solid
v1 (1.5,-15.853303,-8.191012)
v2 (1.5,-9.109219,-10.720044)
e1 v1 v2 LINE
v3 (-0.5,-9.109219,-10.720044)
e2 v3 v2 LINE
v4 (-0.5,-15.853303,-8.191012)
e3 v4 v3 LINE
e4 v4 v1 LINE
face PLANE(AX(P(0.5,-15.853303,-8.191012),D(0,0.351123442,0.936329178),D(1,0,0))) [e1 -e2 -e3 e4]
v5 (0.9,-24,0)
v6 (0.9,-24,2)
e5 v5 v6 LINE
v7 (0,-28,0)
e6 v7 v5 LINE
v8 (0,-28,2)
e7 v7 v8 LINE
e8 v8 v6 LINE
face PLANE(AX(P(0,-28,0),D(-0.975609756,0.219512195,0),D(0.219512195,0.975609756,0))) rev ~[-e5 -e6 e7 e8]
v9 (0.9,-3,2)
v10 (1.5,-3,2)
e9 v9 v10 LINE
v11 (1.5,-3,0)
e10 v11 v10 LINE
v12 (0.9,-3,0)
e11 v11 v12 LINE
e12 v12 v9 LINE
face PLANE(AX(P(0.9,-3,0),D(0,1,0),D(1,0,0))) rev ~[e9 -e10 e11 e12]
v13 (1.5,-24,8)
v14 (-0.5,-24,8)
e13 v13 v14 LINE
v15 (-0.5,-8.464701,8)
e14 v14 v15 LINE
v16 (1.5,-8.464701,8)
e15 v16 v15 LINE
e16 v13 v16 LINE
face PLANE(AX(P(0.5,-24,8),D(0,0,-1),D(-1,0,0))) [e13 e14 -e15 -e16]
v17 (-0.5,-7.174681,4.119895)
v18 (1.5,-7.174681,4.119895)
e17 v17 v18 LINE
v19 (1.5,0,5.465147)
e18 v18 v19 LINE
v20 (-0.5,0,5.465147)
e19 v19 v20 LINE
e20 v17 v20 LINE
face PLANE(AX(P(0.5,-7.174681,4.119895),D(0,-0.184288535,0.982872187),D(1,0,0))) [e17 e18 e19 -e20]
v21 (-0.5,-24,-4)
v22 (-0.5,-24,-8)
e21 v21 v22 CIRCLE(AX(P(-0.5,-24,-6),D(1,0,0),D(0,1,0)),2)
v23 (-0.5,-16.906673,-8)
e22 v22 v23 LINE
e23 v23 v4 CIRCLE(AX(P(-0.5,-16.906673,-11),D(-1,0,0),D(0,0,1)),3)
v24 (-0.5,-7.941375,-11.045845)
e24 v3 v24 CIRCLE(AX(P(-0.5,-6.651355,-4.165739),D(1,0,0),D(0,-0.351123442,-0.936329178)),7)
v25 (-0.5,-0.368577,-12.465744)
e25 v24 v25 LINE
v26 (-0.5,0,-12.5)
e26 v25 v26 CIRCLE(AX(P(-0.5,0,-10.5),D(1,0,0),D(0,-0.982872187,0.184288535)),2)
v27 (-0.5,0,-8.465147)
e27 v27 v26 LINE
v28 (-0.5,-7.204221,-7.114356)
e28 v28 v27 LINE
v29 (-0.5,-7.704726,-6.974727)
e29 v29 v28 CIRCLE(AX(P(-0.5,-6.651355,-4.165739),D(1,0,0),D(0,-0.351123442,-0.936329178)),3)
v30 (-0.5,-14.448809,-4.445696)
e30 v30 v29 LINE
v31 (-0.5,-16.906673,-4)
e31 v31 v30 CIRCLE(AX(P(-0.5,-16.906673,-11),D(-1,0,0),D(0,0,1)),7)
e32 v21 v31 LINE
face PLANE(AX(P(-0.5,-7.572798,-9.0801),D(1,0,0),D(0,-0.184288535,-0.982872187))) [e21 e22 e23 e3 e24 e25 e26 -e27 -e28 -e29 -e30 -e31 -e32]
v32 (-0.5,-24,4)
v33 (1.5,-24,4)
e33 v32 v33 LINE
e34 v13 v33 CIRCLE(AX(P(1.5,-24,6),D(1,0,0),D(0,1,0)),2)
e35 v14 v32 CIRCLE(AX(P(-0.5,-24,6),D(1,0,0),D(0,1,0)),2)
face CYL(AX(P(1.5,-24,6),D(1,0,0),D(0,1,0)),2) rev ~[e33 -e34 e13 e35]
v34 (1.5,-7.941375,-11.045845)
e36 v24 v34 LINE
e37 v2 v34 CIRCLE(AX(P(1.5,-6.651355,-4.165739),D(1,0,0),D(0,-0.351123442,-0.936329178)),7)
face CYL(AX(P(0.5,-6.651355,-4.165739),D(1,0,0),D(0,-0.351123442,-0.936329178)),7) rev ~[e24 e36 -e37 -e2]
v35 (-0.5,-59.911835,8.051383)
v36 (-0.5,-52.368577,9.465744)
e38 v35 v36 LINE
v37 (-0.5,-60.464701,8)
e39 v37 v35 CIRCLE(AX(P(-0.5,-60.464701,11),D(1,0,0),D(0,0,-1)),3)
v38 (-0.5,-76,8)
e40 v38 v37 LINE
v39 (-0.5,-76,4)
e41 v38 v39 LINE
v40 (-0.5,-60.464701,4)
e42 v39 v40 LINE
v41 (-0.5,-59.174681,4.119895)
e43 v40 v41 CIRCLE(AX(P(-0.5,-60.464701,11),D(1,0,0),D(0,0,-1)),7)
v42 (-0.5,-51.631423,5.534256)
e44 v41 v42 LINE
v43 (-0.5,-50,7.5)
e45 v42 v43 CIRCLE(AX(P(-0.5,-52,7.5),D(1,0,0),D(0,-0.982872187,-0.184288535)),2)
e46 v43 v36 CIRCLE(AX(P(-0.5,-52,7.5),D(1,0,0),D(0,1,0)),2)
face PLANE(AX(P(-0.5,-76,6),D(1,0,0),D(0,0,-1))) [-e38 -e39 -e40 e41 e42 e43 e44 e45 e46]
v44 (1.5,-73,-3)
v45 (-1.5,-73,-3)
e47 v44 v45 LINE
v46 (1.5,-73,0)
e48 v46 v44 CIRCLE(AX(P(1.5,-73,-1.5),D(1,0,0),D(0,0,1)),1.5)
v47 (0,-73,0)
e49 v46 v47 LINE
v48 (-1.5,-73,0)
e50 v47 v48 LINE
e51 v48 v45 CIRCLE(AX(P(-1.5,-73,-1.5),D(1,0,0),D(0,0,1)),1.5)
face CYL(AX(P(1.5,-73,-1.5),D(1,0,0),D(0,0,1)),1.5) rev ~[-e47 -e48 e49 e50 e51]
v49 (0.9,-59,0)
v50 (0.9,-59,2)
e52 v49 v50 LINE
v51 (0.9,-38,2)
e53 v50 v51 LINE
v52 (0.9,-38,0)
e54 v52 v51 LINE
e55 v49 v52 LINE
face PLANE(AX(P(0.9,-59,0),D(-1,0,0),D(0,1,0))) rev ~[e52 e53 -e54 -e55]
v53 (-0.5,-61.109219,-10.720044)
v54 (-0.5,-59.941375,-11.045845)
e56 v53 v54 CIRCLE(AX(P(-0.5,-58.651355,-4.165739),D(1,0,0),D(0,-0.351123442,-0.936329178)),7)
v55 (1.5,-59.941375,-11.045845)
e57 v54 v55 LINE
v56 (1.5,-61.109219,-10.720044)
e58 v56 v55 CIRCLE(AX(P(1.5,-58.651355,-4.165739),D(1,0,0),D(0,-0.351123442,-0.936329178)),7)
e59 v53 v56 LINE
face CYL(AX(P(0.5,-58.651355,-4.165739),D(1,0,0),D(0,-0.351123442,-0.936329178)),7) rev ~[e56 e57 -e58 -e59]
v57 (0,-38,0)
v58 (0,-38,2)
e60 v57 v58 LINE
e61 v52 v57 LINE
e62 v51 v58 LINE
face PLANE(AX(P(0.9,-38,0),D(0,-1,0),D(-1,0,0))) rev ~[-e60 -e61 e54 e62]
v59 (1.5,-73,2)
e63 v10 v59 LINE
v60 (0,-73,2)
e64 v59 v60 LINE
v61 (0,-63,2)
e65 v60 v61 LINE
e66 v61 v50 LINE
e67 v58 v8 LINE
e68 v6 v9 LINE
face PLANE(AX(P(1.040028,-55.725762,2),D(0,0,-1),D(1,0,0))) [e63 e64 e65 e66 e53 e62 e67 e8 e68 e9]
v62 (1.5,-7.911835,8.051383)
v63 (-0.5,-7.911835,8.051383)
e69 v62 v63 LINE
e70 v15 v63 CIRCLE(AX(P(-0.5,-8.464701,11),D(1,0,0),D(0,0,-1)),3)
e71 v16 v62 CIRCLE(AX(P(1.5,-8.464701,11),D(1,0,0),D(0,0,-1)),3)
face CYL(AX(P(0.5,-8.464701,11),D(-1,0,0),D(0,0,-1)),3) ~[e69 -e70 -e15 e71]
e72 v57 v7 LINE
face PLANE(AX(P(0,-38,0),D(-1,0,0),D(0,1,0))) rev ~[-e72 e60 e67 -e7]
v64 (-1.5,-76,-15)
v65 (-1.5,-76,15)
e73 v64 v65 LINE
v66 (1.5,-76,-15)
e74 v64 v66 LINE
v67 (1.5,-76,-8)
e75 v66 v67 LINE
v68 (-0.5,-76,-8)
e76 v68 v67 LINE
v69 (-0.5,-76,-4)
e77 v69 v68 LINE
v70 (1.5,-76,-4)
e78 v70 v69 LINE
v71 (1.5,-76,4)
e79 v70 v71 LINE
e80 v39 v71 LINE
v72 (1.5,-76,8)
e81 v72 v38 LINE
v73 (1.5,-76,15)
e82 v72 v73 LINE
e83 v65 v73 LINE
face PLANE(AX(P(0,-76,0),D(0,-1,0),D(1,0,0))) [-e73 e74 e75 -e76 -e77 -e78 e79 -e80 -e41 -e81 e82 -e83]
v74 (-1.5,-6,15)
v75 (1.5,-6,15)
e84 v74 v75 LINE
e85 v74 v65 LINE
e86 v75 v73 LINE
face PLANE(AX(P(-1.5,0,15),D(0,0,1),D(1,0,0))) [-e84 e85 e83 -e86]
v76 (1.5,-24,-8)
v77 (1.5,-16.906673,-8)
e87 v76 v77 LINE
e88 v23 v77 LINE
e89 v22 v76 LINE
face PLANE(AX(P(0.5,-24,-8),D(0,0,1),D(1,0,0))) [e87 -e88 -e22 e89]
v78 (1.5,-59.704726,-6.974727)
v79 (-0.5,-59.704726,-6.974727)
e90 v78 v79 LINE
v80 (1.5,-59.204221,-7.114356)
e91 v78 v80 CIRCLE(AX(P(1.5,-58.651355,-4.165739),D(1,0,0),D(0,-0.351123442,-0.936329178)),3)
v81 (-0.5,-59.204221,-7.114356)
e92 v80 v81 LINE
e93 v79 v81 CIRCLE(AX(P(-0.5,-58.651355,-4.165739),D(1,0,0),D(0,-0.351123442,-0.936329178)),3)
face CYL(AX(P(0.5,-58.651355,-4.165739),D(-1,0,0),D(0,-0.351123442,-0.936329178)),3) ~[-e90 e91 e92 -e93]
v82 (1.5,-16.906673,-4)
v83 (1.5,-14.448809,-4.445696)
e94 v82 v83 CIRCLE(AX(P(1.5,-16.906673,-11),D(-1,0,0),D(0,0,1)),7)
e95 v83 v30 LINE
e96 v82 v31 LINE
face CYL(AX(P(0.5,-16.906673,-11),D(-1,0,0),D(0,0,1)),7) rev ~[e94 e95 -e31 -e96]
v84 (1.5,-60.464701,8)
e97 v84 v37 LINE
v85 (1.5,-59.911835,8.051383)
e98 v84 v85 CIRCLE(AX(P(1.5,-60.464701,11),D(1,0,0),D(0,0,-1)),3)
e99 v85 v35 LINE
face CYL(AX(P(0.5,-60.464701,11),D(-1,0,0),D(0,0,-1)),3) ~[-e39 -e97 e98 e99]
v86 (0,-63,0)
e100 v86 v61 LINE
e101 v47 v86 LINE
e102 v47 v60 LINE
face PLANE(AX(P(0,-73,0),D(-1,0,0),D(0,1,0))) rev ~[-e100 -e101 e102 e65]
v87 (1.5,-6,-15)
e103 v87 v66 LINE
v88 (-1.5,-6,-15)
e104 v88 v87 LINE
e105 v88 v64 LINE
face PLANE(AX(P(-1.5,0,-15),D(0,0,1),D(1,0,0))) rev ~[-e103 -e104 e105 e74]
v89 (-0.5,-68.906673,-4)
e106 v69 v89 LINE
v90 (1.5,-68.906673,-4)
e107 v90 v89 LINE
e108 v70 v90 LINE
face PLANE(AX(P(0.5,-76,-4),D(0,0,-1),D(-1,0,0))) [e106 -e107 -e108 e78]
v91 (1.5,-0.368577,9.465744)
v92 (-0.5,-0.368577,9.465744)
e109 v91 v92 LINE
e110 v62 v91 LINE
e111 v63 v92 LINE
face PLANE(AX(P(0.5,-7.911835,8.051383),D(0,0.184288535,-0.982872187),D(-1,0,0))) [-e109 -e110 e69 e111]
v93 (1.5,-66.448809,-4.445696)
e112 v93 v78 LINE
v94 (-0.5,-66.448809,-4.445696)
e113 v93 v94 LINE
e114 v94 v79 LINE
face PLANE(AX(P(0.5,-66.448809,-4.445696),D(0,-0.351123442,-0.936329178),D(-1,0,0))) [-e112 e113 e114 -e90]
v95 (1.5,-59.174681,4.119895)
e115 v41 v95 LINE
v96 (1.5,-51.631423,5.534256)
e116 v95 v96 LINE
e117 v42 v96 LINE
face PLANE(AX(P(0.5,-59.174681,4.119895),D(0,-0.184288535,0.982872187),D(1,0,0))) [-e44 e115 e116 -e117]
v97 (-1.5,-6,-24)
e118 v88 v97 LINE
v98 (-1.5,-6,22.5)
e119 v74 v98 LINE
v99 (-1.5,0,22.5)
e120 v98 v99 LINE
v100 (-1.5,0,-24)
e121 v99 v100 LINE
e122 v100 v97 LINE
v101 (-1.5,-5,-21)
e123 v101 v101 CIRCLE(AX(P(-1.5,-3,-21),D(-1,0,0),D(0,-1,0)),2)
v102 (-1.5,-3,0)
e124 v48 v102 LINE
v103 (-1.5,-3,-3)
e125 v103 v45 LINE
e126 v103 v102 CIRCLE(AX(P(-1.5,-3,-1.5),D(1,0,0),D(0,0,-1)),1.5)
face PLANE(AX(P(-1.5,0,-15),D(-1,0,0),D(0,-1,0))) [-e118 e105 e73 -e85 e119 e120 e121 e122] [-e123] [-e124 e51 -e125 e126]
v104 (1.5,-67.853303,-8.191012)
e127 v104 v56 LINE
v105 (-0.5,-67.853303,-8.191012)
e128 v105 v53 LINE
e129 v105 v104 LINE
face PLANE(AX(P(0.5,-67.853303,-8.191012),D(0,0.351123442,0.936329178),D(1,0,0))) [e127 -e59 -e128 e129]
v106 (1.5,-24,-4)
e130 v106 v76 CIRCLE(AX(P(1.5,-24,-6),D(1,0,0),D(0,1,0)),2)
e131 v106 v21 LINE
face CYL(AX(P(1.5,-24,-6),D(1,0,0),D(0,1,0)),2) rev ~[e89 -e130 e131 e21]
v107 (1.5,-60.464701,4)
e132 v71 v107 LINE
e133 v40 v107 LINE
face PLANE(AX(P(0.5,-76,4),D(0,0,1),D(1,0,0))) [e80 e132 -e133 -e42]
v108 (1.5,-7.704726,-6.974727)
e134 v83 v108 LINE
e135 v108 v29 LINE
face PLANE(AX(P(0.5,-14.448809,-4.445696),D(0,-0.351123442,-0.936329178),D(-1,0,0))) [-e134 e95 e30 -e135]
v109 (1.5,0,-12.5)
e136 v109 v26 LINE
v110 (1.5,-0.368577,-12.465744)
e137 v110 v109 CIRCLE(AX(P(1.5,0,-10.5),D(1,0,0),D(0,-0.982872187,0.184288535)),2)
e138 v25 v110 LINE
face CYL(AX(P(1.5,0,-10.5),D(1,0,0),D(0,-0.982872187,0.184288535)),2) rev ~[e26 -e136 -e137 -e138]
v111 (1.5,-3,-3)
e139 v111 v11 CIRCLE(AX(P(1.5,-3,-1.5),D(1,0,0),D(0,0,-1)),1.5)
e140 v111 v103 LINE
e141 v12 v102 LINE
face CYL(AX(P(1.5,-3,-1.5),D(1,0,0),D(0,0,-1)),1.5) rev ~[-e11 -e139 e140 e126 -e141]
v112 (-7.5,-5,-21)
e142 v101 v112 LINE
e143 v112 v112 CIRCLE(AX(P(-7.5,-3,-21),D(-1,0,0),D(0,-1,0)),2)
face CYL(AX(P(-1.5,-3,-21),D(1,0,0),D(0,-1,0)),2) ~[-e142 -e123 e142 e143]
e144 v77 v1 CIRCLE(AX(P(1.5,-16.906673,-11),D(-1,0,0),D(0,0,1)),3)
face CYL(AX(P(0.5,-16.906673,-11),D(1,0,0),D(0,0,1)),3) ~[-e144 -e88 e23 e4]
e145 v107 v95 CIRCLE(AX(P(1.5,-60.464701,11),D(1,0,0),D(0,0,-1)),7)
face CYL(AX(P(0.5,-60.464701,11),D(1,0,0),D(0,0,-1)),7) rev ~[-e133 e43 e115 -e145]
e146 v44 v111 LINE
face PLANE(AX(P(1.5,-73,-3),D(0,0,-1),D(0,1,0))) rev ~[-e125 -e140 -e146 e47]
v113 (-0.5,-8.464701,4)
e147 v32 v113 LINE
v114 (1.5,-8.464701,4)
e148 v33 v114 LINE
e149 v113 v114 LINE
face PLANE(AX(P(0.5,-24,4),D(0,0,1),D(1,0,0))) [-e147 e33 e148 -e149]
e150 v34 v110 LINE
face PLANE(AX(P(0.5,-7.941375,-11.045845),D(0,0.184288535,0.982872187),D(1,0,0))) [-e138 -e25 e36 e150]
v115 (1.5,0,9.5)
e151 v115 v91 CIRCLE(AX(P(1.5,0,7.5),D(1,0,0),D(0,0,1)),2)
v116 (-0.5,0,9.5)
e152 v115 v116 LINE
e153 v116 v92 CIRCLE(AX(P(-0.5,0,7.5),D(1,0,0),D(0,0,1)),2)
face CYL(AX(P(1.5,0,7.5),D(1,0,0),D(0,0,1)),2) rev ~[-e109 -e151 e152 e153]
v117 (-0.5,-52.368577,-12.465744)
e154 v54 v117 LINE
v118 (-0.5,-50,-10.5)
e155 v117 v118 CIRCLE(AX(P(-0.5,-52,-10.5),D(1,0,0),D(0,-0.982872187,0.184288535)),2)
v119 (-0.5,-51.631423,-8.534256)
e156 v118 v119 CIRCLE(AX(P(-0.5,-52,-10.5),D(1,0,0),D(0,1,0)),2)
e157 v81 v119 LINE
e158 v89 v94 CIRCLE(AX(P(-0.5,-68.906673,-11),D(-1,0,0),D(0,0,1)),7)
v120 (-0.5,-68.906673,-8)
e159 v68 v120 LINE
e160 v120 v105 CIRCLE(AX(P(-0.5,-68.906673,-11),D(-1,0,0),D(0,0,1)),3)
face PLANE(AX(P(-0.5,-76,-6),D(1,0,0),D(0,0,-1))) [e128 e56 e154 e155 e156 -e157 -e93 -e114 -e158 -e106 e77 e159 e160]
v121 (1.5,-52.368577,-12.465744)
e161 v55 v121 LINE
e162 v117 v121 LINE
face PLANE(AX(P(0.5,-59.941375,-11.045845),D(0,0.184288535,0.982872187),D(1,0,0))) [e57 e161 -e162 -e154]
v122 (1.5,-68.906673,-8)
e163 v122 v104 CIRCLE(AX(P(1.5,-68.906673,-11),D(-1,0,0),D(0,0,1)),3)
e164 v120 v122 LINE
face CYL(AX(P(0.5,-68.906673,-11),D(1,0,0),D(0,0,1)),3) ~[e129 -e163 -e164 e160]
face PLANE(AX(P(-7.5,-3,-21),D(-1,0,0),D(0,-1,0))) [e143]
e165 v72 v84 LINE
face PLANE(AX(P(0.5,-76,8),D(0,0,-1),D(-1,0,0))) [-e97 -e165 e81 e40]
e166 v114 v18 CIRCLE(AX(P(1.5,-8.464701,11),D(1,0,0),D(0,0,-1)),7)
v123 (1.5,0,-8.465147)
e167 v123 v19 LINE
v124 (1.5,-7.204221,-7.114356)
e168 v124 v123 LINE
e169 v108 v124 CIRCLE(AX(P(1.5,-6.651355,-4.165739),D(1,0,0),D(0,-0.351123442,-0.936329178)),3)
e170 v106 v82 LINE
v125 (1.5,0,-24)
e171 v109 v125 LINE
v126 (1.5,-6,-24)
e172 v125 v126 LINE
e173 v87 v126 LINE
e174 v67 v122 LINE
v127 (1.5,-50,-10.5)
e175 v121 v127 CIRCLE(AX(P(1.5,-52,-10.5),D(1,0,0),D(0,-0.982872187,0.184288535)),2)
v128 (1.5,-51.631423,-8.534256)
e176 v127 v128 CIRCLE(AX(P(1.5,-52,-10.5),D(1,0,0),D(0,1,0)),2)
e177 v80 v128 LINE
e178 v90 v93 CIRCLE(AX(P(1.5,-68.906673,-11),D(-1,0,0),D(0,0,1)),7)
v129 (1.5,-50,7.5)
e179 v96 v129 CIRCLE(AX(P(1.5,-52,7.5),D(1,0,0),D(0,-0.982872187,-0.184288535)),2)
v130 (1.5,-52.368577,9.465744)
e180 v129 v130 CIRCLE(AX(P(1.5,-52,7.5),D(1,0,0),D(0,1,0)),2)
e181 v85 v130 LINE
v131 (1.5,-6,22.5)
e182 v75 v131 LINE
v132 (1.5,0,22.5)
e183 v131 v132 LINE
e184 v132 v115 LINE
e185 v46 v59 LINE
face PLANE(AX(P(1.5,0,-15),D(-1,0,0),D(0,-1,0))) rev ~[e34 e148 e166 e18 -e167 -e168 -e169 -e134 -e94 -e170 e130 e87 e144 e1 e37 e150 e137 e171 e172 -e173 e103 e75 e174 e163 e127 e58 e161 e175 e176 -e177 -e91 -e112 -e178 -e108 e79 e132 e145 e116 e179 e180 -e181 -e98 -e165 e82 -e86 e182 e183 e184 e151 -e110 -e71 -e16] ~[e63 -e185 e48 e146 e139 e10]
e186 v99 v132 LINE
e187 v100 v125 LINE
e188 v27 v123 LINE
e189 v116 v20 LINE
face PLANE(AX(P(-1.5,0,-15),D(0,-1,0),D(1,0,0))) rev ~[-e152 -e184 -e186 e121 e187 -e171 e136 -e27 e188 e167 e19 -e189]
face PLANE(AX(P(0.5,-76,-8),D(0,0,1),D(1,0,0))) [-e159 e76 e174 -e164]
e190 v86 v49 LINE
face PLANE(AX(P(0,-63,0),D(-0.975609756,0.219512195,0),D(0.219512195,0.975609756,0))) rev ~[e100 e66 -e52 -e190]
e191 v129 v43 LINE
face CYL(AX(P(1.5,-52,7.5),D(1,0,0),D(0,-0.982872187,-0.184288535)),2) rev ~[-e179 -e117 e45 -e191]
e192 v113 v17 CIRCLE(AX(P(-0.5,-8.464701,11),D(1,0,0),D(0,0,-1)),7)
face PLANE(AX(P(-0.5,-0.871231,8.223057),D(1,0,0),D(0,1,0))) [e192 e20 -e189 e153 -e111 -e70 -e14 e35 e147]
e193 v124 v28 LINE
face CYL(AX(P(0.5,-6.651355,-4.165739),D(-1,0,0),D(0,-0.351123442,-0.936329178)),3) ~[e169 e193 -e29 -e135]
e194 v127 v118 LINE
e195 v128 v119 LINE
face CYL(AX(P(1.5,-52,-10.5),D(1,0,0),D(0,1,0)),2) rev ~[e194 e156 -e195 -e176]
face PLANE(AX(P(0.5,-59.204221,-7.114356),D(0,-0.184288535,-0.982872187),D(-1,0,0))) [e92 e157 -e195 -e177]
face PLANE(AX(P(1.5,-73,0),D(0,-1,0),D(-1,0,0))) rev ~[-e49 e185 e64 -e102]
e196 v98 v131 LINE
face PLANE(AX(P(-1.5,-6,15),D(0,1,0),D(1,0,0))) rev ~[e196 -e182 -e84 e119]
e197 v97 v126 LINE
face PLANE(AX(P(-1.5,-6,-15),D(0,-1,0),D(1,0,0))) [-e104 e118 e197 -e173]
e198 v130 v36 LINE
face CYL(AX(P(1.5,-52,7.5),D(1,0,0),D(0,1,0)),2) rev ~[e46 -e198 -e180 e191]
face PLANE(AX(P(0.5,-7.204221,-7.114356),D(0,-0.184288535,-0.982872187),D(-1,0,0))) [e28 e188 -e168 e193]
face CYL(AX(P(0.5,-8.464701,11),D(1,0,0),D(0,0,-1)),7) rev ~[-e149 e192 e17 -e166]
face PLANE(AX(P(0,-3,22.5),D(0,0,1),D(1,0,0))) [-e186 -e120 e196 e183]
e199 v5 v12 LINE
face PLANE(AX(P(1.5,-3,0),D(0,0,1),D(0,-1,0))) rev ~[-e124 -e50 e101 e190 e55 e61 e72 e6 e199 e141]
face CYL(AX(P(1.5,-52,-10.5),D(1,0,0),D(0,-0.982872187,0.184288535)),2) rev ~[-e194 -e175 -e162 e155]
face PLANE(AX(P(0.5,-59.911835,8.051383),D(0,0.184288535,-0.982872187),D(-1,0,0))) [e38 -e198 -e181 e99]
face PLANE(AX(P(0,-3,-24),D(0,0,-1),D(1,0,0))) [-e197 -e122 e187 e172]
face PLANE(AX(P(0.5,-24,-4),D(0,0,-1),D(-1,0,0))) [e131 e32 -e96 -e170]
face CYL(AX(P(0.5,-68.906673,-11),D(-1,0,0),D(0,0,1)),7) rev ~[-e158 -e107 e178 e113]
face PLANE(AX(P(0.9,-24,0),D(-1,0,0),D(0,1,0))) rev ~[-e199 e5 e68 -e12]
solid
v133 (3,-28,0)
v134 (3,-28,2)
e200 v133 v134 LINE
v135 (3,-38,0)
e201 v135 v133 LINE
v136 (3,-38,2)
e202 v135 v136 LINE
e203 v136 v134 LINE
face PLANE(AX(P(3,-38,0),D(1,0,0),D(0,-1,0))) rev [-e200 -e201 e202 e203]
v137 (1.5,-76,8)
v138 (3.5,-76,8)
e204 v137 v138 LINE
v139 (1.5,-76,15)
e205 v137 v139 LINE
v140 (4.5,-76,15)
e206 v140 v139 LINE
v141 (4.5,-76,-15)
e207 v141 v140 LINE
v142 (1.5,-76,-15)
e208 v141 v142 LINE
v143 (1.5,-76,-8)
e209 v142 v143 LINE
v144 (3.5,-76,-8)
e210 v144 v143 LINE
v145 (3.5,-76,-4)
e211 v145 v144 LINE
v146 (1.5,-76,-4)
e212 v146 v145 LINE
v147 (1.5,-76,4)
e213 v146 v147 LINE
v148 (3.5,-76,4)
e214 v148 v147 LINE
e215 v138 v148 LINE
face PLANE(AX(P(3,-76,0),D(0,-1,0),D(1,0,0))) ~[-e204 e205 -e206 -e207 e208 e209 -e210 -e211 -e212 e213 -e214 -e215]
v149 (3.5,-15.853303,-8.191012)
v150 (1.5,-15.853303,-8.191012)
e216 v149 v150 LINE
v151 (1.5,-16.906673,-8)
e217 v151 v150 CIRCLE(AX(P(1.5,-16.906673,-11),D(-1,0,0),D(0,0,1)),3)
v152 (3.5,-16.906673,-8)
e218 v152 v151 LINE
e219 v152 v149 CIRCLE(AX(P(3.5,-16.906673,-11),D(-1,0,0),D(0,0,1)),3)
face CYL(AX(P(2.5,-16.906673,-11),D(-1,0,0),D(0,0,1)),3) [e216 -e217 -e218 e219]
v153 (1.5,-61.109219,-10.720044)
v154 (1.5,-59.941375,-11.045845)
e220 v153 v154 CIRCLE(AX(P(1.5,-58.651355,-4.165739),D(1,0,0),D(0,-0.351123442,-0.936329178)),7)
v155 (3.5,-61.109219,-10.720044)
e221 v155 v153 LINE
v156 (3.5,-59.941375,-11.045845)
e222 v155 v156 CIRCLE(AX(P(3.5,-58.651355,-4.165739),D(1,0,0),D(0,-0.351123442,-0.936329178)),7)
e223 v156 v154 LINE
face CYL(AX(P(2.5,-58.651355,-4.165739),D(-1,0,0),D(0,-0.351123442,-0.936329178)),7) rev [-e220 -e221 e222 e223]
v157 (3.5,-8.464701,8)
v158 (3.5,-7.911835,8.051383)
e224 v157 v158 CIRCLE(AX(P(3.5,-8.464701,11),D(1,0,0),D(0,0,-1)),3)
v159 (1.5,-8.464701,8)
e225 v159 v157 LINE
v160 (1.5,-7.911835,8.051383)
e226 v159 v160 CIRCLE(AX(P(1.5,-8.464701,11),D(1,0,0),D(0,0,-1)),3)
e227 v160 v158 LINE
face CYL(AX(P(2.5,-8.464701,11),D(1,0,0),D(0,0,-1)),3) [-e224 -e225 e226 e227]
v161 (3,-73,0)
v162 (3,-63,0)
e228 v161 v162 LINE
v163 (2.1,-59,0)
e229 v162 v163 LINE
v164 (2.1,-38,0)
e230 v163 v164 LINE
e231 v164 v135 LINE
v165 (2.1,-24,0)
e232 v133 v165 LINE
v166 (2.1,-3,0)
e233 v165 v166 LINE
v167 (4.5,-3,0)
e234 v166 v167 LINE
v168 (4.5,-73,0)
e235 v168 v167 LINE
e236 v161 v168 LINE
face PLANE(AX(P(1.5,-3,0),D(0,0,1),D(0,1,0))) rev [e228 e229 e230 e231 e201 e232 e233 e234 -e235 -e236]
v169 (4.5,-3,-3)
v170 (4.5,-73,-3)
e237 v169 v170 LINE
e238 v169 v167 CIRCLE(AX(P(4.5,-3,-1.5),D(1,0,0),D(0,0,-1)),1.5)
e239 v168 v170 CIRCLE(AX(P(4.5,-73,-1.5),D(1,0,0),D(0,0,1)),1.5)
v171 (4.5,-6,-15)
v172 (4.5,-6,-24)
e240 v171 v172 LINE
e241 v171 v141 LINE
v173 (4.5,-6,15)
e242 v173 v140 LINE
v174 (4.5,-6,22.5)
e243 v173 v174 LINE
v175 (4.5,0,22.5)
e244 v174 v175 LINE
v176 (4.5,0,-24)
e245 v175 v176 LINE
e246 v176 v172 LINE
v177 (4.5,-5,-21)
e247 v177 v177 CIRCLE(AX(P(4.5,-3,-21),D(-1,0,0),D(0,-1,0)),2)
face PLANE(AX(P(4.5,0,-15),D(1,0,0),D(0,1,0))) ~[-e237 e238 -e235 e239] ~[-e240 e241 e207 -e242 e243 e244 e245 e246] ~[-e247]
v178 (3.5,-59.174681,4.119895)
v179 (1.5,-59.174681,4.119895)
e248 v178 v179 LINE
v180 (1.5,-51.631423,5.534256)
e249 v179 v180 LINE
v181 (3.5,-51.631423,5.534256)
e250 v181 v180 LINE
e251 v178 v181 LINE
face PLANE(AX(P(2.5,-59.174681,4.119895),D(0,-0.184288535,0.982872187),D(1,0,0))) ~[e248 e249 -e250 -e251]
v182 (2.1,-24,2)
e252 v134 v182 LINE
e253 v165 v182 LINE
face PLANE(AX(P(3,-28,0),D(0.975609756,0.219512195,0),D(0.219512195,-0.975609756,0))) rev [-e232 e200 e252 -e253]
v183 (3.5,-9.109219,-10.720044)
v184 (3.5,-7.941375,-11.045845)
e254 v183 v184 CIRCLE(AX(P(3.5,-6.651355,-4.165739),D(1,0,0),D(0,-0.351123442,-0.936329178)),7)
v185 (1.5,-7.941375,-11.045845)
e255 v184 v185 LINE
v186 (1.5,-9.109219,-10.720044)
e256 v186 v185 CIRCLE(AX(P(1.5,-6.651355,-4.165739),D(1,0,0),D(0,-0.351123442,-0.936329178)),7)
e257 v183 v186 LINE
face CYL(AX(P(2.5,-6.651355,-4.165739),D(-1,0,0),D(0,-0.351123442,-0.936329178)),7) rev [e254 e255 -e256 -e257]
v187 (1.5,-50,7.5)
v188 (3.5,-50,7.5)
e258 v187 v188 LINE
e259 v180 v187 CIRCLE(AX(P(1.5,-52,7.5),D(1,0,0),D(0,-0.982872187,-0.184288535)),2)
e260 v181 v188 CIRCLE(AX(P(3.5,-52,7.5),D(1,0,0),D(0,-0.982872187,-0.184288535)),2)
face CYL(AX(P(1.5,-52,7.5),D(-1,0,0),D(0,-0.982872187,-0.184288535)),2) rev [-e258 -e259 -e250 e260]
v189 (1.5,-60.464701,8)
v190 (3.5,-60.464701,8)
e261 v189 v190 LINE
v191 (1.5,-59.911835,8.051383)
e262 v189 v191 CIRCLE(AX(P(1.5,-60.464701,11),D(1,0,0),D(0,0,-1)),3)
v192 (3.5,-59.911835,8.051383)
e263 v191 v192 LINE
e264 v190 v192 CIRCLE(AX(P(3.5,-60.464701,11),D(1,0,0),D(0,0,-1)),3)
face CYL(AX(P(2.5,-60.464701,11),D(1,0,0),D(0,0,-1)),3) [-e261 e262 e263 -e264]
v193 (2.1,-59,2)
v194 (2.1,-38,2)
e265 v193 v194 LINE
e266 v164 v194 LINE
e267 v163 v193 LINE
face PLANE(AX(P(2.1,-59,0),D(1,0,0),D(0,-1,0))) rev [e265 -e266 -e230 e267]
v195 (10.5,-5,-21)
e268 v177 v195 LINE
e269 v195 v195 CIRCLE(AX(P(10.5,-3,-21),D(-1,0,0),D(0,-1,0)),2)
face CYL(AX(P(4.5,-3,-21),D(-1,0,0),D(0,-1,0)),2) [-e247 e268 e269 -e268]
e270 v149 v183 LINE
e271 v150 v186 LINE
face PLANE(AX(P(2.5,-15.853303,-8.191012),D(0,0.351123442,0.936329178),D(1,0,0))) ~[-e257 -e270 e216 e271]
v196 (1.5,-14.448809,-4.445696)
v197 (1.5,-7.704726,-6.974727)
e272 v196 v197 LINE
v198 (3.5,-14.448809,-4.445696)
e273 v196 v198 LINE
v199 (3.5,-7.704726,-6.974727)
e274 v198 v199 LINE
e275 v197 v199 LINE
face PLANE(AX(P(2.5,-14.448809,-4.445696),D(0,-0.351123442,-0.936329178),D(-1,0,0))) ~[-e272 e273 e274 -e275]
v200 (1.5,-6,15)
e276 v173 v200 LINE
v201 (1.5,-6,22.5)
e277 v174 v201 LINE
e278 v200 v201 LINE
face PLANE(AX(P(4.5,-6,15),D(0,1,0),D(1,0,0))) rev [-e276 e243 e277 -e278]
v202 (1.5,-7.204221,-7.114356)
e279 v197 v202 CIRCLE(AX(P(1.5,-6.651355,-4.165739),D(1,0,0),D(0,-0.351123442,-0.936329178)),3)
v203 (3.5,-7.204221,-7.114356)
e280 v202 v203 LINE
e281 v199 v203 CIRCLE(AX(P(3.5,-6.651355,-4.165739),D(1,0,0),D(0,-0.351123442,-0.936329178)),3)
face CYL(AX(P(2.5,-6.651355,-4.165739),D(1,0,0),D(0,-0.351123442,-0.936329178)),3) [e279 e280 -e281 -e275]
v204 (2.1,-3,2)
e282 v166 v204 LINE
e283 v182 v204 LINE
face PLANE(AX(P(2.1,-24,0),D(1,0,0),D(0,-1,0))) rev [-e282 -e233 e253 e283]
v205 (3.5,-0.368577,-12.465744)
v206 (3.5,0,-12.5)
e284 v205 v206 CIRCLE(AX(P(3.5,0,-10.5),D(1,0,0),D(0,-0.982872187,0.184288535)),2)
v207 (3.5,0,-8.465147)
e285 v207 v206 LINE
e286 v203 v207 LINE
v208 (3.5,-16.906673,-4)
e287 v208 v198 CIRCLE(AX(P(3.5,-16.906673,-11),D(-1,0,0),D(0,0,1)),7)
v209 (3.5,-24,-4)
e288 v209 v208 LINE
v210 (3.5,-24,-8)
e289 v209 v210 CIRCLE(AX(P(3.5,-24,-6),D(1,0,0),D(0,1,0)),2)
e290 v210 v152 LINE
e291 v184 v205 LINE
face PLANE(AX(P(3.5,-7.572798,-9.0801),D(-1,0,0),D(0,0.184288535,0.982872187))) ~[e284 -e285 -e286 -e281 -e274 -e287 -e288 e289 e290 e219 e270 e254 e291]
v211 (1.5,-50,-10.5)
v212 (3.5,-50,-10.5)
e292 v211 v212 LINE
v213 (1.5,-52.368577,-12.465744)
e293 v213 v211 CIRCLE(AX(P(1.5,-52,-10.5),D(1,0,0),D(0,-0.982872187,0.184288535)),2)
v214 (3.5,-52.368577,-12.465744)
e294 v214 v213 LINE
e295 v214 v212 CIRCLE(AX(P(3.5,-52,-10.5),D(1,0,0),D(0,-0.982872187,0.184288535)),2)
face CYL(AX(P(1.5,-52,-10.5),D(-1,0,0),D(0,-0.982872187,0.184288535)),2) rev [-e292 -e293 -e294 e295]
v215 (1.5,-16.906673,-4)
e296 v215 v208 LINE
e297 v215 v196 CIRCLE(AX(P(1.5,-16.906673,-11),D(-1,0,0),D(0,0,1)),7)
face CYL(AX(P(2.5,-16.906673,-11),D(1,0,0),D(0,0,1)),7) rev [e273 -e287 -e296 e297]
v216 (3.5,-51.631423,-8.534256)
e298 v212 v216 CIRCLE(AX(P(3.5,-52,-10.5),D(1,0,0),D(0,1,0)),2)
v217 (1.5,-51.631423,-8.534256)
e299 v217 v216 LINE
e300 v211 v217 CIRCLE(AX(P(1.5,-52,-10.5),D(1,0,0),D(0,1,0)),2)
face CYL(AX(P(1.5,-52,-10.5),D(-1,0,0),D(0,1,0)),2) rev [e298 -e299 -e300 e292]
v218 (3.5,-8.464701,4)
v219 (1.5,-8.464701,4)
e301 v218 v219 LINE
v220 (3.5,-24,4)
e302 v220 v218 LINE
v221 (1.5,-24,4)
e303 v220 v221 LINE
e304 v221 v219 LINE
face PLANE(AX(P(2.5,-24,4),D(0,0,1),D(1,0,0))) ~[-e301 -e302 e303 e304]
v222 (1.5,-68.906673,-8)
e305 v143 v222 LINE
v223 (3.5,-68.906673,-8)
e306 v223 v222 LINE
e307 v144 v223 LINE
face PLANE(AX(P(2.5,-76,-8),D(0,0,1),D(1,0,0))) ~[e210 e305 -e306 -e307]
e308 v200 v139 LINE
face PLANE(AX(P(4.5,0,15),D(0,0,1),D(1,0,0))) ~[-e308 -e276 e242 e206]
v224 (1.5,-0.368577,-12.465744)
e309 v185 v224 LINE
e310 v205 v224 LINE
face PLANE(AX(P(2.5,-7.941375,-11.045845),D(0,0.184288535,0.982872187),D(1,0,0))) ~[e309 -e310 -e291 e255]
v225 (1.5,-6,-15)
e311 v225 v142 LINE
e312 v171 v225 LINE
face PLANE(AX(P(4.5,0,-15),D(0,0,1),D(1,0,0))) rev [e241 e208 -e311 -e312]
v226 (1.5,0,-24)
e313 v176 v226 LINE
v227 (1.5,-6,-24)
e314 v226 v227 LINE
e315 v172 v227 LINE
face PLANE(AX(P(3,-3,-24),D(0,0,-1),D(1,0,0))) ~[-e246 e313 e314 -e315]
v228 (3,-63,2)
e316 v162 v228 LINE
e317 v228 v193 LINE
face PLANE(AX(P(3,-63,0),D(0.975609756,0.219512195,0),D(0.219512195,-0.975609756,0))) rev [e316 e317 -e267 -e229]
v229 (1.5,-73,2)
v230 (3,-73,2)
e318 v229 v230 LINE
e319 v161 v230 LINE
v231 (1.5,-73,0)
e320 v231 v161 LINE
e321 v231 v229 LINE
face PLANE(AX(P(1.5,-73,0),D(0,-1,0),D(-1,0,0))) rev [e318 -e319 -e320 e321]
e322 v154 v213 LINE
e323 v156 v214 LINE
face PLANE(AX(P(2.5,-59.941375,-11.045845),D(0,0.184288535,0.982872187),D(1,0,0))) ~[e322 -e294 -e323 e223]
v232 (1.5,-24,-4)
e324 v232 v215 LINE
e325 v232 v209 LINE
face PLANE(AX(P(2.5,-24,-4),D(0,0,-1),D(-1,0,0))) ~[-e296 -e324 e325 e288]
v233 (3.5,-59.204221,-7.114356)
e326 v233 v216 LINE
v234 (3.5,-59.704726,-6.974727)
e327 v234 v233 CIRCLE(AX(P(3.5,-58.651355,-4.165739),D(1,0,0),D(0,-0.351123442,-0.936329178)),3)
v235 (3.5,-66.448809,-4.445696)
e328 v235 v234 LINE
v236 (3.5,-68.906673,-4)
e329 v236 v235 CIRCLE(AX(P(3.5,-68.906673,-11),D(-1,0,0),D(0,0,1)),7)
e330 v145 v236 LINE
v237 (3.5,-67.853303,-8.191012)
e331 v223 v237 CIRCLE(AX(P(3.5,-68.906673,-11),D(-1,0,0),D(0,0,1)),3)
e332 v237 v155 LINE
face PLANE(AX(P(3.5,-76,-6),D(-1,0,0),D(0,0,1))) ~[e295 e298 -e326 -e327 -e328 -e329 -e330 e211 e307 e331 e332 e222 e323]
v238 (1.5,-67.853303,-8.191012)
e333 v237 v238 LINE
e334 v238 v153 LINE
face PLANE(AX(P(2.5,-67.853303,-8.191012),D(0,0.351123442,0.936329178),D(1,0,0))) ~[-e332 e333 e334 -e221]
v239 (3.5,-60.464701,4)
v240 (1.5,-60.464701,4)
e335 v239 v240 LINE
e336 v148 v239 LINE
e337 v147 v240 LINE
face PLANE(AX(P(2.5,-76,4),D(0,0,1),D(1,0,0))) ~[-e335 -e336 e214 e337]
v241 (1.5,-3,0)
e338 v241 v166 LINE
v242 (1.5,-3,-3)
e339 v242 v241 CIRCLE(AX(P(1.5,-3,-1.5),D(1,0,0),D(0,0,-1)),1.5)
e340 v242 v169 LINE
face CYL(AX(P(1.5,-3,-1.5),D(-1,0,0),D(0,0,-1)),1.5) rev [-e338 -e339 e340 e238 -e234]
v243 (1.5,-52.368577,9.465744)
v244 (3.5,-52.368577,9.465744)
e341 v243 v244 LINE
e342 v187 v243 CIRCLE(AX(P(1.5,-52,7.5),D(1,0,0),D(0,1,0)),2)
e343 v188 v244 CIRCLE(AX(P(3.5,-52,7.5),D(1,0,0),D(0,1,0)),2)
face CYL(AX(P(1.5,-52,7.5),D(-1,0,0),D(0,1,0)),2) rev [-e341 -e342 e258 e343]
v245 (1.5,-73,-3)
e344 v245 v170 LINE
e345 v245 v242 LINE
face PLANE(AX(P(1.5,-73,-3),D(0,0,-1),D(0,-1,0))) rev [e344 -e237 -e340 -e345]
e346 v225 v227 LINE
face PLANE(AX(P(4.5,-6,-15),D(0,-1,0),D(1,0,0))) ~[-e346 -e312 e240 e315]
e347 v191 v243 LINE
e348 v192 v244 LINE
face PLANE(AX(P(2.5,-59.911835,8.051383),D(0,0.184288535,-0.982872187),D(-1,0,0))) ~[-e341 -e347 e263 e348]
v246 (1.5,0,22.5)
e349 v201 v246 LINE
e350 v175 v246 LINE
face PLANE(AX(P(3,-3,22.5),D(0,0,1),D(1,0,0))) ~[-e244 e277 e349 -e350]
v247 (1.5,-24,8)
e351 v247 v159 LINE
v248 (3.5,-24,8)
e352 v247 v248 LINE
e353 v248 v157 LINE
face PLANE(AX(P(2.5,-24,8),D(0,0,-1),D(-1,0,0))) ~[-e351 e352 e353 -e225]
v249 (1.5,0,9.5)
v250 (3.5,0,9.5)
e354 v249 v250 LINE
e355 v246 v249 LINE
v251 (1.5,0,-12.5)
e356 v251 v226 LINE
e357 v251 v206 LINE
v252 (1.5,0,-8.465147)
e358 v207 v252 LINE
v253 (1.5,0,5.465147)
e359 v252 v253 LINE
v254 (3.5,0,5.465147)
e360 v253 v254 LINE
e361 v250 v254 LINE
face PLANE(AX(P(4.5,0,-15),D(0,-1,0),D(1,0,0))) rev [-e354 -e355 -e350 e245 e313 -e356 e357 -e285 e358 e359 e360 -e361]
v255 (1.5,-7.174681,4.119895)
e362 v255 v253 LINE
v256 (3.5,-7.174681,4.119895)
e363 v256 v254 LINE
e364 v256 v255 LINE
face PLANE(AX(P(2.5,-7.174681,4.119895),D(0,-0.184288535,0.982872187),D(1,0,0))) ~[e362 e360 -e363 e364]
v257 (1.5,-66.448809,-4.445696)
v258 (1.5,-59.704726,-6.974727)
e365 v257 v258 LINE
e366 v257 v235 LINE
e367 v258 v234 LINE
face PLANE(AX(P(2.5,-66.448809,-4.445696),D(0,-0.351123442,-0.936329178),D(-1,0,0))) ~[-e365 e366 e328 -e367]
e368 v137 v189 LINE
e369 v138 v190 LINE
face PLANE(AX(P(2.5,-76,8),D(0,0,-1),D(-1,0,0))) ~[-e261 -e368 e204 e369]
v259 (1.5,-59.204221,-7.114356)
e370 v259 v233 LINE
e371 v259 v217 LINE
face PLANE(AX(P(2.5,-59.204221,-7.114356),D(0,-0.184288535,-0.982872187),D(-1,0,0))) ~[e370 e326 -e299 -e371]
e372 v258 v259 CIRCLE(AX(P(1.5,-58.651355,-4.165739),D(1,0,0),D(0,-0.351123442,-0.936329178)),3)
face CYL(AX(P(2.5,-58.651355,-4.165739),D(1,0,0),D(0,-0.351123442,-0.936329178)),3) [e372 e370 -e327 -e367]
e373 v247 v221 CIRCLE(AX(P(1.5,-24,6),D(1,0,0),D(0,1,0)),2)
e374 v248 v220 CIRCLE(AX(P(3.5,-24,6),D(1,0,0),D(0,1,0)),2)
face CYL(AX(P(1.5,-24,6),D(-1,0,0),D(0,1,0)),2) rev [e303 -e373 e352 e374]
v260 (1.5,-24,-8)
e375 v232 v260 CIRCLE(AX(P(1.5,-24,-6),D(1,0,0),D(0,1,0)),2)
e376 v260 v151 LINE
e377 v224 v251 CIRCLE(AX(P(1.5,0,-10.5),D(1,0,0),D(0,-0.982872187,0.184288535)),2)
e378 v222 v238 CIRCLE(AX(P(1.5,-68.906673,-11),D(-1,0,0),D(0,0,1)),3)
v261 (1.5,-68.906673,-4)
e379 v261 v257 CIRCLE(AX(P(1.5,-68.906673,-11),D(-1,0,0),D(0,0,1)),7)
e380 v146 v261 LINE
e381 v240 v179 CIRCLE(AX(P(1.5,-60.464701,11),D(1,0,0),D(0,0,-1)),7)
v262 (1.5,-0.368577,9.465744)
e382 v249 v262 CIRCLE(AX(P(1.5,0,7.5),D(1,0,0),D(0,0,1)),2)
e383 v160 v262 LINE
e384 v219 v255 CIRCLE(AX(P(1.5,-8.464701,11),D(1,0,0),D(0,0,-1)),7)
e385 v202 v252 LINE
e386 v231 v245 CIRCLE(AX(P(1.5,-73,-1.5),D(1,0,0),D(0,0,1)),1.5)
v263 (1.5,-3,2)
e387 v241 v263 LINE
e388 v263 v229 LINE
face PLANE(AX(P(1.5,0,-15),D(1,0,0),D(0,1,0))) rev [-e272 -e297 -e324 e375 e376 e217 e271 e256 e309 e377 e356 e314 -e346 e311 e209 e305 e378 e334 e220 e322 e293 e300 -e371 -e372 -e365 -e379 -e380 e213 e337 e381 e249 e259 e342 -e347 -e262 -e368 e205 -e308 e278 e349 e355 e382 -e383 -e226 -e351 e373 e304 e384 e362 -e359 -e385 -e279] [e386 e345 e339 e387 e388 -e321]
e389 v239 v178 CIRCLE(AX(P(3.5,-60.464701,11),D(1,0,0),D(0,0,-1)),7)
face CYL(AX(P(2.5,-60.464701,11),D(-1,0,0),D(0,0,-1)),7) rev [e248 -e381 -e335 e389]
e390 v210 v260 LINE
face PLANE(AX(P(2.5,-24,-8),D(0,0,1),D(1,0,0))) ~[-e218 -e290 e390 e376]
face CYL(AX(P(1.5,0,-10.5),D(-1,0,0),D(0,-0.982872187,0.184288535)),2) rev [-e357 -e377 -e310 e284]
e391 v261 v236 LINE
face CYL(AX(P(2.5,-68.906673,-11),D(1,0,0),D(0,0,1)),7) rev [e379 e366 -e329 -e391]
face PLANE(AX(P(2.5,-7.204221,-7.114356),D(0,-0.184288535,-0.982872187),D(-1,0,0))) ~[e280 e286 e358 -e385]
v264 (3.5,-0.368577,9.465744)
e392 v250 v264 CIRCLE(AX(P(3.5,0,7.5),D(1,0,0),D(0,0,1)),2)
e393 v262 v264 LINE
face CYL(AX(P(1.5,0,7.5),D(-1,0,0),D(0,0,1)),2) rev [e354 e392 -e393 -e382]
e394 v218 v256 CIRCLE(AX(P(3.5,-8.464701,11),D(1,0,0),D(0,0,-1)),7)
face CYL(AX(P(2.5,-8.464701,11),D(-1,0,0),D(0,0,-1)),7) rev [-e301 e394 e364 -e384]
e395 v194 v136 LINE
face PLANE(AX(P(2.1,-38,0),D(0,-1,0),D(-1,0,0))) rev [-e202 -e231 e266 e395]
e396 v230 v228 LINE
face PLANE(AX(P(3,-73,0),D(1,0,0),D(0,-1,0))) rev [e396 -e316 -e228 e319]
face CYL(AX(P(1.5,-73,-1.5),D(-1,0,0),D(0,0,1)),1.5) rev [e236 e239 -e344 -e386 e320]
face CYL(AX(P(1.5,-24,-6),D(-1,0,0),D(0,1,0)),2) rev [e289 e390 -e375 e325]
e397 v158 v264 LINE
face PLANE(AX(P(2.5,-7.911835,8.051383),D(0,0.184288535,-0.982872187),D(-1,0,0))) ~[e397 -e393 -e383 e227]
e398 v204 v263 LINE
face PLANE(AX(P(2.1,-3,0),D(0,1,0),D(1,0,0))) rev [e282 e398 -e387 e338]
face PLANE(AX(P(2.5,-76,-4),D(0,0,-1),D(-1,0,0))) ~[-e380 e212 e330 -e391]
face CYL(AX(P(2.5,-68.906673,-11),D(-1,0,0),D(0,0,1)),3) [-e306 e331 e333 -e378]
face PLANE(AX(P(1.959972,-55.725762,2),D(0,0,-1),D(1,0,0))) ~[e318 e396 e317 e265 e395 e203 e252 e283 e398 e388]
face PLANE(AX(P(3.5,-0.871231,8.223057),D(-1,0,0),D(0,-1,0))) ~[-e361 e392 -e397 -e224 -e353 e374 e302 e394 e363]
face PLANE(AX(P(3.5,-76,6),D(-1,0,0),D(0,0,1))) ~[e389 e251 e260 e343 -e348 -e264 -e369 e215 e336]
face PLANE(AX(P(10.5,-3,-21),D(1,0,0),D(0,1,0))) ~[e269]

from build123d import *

# Parameters (mm, degrees)
F0_W      = 3
F0_H      = 30
F1_DEPTH  = 76
F3_W      = 2
F3_H      = 4
F7_W      = 2
F7_H      = 4
F2_R      = 2
F10_DEPTH = 2
F11_DEPTH = 3.001
F13_DEPTH = 2
F14_W     = 3
F14_H     = 6
F15_DEPTH = 7.5
F16_W     = 3
F16_H     = 6
F17_DEPTH = 9
F18_R     = 2
F19_DEPTH = 6


# Not quite as in the source:
# - a feature names something its author has since deleted; it is built from what else it names


with BuildPart() as f1:
    # F0 (on Front) → F1 (new body)
    with BuildSketch(Plane.XZ):
        Rectangle(F0_W, F0_H)
    extrude(amount=F1_DEPTH)

    # F4: sweep along a path in F2
    with BuildLine(Plane.YZ.offset(1.5)) as f4_path:
        Line((-76, -6), (-68.9066729089, -6))
        ThreePointArc((-68.9066729089, -6), (-68.0145488814, -6.0802322494), (-67.1510557009, -6.3183541122))
        Line((-67.1510557009, -6.3183541122), (-60.4069723837, -8.8473853561))
        ThreePointArc((-60.4069723837, -8.8473853561), (-59.9949330402, -8.9818373205), (-59.572797851, -9.0801004029))
        Line((-59.572797851, -9.0801004029), (-52, -10.5))
    # F3 (on face) → F4 (sweep, cut)
    with BuildSketch(Plane.XZ.offset(76)):
        with Locations((0.5, -6)):
            Rectangle(F3_W, F3_H)
    sweep(path=f4_path.line, mode=Mode.SUBTRACT)

    # F5: sweep along a path in F2
    with BuildLine(Plane.YZ.offset(1.5)) as f5_path:
        Line((-76, 6), (-68, 6))
        Line((-68, 6), (-60.4647009935, 6))
        ThreePointArc((-60.4647009935, 6), (-60.0019941065, 6.0214558015), (-59.5432583182, 6.0856390653))
        Line((-59.5432583182, 6.0856390653), (-52, 7.5))
    # F3 (on face) → F5 (sweep, cut)
    with BuildSketch(Plane.XZ.offset(76)):
        with Locations((0.5, 6)):
            Rectangle(F3_W, F3_H)
    sweep(path=f5_path.line, mode=Mode.SUBTRACT)

    # F8: sweep along a path in F2
    with BuildLine(Plane.YZ.offset(1.5)) as f8_path:
        Line((-24, -6), (-16.9066729089, -6))
        ThreePointArc((-16.9066729089, -6), (-16.0145488814, -6.0802322494), (-15.1510557009, -6.3183541122))
        Line((-15.1510557009, -6.3183541122), (-8.4069723837, -8.8473853561))
        ThreePointArc((-8.4069723837, -8.8473853561), (-7.9949330402, -8.9818373205), (-7.572797851, -9.0801004029))
        Line((-7.572797851, -9.0801004029), (0, -10.5))
    # F7 (on offset) → F8 (sweep, cut)
    with BuildSketch(Plane.XZ.offset(24)):
        with Locations((0.5, -6)):
            Rectangle(F7_W, F7_H)
    sweep(path=f8_path.line, mode=Mode.SUBTRACT)

    # F9: sweep along a path in F2
    with BuildLine(Plane.YZ.offset(1.5)) as f9_path:
        Line((-24, 6), (-16, 6))
        Line((-16, 6), (-8.4647009935, 6))
        ThreePointArc((-8.4647009935, 6), (-8.0019941065, 6.0214558015), (-7.5432583182, 6.0856390653))
        Line((-7.5432583182, 6.0856390653), (0, 7.5))
    # F7 (on offset) → F9 (sweep, cut)
    with BuildSketch(Plane.XZ.offset(24)):
        with Locations((0.5, 6)):
            Rectangle(F7_W, F7_H)
    sweep(path=f9_path.line, mode=Mode.SUBTRACT)

    # F2 (on face) → F10 (cut)
    with BuildSketch(Plane.YZ.offset(1.5)):
        with BuildLine():
            ThreePointArc((-50, 7.5), (-52.1850827548, 9.4914176794), (-53.9657443739, 7.1314229299))
            ThreePointArc((-53.9657443739, 7.1314229299), (-51.8149172452, 5.5085823206), (-50, 7.5))
        make_face()
        with BuildLine():
            ThreePointArc((-50, -10.5), (-51.8149172452, -8.5085823206), (-53.9657443739, -10.1314229299))
            ThreePointArc((-53.9657443739, -10.1314229299), (-52.1850827548, -12.4914176794), (-50, -10.5))
        make_face()
        with BuildLine():
            Line((0, 7.5), (0, 9.5))
            ThreePointArc((0, 9.5), (-1.5390182163, 8.7772716743), (-1.9657443739, 7.1314229299))
            Line((-1.9657443739, 7.1314229299), (0, 7.5))
        make_face()
        with BuildLine():
            ThreePointArc((-1.9657443739, -10.1314229299), (-1.5390182163, -11.7772716743), (0, -12.5))
            Line((0, -12.5), (0, -10.5))
            Line((0, -10.5), (-1.9657443739, -10.1314229299))
        make_face()
        with Locations((-24, 6)):
            Circle(F2_R)
        with Locations((-24, -6)):
            Circle(F2_R)
    extrude(amount=-F10_DEPTH, mode=Mode.SUBTRACT)

    # F2 (on face) → F11 (cut, through all)
    with BuildSketch(Plane.YZ.offset(1.5)):
        with BuildLine():
            Line((-38, 0), (-73, 0))
            ThreePointArc((-73, 0), (-74.5, -1.5), (-73, -3))
            Line((-73, -3), (-38, -3))
            Line((-38, -3), (-38, 0))
        make_face()
        with BuildLine():
            Line((-3, 0), (-38, 0))
            Line((-38, 0), (-38, -3))
            Line((-38, -3), (-3, -3))
            ThreePointArc((-3, -3), (-1.5, -1.5), (-3, 0))
        make_face()
    extrude(amount=-F11_DEPTH, mode=Mode.SUBTRACT)

    # F12 (on face) → F13 (cut)
    with BuildSketch(Plane(origin=(0, 0, 0), x_dir=(1, 0, 0), z_dir=(0, 0, -1))):
        Polygon((1.5, 38), (1.5, 73), (0, 73), (0, 63), (0.9, 59), (0.9, 38), align=None)
        Polygon((1.5, 3), (1.5, 38), (0.9, 38), (0, 38), (0, 28), (0.9, 24), (0.9, 3), align=None)
    extrude(amount=-F13_DEPTH, mode=Mode.SUBTRACT)

    # F14 (on face) → F15 (join)
    with BuildSketch(Plane.XY.offset(15)):
        with Locations((0, -3)):
            Rectangle(F14_W, F14_H)
    extrude(amount=F15_DEPTH)

    # F16 (on face) → F17 (join)
    with BuildSketch(Plane(origin=(0, 0, -15), x_dir=(1, 0, 0), z_dir=(0, 0, -1))):
        with Locations((0, 3)):
            Rectangle(F16_W, F16_H)
    extrude(amount=F17_DEPTH)

    # F18 (on face) → F19 (join)
    with BuildSketch(Plane(origin=(-1.5, 0, 0), x_dir=(0, -1, 0), z_dir=(-1, 0, 0))):
        with Locations((3, -21)):
            Circle(F18_R)
    extrude(amount=F19_DEPTH)


with BuildPart() as f20_1:
    # F20: instance of F1
    add(f1.part.mirror(Plane(origin=(1.5, -35.8541868499, 0.1982615546), x_dir=(0, 1, 0), z_dir=(1, 0, 0))))


solid = Compound([f1.part, f20_1.part])
